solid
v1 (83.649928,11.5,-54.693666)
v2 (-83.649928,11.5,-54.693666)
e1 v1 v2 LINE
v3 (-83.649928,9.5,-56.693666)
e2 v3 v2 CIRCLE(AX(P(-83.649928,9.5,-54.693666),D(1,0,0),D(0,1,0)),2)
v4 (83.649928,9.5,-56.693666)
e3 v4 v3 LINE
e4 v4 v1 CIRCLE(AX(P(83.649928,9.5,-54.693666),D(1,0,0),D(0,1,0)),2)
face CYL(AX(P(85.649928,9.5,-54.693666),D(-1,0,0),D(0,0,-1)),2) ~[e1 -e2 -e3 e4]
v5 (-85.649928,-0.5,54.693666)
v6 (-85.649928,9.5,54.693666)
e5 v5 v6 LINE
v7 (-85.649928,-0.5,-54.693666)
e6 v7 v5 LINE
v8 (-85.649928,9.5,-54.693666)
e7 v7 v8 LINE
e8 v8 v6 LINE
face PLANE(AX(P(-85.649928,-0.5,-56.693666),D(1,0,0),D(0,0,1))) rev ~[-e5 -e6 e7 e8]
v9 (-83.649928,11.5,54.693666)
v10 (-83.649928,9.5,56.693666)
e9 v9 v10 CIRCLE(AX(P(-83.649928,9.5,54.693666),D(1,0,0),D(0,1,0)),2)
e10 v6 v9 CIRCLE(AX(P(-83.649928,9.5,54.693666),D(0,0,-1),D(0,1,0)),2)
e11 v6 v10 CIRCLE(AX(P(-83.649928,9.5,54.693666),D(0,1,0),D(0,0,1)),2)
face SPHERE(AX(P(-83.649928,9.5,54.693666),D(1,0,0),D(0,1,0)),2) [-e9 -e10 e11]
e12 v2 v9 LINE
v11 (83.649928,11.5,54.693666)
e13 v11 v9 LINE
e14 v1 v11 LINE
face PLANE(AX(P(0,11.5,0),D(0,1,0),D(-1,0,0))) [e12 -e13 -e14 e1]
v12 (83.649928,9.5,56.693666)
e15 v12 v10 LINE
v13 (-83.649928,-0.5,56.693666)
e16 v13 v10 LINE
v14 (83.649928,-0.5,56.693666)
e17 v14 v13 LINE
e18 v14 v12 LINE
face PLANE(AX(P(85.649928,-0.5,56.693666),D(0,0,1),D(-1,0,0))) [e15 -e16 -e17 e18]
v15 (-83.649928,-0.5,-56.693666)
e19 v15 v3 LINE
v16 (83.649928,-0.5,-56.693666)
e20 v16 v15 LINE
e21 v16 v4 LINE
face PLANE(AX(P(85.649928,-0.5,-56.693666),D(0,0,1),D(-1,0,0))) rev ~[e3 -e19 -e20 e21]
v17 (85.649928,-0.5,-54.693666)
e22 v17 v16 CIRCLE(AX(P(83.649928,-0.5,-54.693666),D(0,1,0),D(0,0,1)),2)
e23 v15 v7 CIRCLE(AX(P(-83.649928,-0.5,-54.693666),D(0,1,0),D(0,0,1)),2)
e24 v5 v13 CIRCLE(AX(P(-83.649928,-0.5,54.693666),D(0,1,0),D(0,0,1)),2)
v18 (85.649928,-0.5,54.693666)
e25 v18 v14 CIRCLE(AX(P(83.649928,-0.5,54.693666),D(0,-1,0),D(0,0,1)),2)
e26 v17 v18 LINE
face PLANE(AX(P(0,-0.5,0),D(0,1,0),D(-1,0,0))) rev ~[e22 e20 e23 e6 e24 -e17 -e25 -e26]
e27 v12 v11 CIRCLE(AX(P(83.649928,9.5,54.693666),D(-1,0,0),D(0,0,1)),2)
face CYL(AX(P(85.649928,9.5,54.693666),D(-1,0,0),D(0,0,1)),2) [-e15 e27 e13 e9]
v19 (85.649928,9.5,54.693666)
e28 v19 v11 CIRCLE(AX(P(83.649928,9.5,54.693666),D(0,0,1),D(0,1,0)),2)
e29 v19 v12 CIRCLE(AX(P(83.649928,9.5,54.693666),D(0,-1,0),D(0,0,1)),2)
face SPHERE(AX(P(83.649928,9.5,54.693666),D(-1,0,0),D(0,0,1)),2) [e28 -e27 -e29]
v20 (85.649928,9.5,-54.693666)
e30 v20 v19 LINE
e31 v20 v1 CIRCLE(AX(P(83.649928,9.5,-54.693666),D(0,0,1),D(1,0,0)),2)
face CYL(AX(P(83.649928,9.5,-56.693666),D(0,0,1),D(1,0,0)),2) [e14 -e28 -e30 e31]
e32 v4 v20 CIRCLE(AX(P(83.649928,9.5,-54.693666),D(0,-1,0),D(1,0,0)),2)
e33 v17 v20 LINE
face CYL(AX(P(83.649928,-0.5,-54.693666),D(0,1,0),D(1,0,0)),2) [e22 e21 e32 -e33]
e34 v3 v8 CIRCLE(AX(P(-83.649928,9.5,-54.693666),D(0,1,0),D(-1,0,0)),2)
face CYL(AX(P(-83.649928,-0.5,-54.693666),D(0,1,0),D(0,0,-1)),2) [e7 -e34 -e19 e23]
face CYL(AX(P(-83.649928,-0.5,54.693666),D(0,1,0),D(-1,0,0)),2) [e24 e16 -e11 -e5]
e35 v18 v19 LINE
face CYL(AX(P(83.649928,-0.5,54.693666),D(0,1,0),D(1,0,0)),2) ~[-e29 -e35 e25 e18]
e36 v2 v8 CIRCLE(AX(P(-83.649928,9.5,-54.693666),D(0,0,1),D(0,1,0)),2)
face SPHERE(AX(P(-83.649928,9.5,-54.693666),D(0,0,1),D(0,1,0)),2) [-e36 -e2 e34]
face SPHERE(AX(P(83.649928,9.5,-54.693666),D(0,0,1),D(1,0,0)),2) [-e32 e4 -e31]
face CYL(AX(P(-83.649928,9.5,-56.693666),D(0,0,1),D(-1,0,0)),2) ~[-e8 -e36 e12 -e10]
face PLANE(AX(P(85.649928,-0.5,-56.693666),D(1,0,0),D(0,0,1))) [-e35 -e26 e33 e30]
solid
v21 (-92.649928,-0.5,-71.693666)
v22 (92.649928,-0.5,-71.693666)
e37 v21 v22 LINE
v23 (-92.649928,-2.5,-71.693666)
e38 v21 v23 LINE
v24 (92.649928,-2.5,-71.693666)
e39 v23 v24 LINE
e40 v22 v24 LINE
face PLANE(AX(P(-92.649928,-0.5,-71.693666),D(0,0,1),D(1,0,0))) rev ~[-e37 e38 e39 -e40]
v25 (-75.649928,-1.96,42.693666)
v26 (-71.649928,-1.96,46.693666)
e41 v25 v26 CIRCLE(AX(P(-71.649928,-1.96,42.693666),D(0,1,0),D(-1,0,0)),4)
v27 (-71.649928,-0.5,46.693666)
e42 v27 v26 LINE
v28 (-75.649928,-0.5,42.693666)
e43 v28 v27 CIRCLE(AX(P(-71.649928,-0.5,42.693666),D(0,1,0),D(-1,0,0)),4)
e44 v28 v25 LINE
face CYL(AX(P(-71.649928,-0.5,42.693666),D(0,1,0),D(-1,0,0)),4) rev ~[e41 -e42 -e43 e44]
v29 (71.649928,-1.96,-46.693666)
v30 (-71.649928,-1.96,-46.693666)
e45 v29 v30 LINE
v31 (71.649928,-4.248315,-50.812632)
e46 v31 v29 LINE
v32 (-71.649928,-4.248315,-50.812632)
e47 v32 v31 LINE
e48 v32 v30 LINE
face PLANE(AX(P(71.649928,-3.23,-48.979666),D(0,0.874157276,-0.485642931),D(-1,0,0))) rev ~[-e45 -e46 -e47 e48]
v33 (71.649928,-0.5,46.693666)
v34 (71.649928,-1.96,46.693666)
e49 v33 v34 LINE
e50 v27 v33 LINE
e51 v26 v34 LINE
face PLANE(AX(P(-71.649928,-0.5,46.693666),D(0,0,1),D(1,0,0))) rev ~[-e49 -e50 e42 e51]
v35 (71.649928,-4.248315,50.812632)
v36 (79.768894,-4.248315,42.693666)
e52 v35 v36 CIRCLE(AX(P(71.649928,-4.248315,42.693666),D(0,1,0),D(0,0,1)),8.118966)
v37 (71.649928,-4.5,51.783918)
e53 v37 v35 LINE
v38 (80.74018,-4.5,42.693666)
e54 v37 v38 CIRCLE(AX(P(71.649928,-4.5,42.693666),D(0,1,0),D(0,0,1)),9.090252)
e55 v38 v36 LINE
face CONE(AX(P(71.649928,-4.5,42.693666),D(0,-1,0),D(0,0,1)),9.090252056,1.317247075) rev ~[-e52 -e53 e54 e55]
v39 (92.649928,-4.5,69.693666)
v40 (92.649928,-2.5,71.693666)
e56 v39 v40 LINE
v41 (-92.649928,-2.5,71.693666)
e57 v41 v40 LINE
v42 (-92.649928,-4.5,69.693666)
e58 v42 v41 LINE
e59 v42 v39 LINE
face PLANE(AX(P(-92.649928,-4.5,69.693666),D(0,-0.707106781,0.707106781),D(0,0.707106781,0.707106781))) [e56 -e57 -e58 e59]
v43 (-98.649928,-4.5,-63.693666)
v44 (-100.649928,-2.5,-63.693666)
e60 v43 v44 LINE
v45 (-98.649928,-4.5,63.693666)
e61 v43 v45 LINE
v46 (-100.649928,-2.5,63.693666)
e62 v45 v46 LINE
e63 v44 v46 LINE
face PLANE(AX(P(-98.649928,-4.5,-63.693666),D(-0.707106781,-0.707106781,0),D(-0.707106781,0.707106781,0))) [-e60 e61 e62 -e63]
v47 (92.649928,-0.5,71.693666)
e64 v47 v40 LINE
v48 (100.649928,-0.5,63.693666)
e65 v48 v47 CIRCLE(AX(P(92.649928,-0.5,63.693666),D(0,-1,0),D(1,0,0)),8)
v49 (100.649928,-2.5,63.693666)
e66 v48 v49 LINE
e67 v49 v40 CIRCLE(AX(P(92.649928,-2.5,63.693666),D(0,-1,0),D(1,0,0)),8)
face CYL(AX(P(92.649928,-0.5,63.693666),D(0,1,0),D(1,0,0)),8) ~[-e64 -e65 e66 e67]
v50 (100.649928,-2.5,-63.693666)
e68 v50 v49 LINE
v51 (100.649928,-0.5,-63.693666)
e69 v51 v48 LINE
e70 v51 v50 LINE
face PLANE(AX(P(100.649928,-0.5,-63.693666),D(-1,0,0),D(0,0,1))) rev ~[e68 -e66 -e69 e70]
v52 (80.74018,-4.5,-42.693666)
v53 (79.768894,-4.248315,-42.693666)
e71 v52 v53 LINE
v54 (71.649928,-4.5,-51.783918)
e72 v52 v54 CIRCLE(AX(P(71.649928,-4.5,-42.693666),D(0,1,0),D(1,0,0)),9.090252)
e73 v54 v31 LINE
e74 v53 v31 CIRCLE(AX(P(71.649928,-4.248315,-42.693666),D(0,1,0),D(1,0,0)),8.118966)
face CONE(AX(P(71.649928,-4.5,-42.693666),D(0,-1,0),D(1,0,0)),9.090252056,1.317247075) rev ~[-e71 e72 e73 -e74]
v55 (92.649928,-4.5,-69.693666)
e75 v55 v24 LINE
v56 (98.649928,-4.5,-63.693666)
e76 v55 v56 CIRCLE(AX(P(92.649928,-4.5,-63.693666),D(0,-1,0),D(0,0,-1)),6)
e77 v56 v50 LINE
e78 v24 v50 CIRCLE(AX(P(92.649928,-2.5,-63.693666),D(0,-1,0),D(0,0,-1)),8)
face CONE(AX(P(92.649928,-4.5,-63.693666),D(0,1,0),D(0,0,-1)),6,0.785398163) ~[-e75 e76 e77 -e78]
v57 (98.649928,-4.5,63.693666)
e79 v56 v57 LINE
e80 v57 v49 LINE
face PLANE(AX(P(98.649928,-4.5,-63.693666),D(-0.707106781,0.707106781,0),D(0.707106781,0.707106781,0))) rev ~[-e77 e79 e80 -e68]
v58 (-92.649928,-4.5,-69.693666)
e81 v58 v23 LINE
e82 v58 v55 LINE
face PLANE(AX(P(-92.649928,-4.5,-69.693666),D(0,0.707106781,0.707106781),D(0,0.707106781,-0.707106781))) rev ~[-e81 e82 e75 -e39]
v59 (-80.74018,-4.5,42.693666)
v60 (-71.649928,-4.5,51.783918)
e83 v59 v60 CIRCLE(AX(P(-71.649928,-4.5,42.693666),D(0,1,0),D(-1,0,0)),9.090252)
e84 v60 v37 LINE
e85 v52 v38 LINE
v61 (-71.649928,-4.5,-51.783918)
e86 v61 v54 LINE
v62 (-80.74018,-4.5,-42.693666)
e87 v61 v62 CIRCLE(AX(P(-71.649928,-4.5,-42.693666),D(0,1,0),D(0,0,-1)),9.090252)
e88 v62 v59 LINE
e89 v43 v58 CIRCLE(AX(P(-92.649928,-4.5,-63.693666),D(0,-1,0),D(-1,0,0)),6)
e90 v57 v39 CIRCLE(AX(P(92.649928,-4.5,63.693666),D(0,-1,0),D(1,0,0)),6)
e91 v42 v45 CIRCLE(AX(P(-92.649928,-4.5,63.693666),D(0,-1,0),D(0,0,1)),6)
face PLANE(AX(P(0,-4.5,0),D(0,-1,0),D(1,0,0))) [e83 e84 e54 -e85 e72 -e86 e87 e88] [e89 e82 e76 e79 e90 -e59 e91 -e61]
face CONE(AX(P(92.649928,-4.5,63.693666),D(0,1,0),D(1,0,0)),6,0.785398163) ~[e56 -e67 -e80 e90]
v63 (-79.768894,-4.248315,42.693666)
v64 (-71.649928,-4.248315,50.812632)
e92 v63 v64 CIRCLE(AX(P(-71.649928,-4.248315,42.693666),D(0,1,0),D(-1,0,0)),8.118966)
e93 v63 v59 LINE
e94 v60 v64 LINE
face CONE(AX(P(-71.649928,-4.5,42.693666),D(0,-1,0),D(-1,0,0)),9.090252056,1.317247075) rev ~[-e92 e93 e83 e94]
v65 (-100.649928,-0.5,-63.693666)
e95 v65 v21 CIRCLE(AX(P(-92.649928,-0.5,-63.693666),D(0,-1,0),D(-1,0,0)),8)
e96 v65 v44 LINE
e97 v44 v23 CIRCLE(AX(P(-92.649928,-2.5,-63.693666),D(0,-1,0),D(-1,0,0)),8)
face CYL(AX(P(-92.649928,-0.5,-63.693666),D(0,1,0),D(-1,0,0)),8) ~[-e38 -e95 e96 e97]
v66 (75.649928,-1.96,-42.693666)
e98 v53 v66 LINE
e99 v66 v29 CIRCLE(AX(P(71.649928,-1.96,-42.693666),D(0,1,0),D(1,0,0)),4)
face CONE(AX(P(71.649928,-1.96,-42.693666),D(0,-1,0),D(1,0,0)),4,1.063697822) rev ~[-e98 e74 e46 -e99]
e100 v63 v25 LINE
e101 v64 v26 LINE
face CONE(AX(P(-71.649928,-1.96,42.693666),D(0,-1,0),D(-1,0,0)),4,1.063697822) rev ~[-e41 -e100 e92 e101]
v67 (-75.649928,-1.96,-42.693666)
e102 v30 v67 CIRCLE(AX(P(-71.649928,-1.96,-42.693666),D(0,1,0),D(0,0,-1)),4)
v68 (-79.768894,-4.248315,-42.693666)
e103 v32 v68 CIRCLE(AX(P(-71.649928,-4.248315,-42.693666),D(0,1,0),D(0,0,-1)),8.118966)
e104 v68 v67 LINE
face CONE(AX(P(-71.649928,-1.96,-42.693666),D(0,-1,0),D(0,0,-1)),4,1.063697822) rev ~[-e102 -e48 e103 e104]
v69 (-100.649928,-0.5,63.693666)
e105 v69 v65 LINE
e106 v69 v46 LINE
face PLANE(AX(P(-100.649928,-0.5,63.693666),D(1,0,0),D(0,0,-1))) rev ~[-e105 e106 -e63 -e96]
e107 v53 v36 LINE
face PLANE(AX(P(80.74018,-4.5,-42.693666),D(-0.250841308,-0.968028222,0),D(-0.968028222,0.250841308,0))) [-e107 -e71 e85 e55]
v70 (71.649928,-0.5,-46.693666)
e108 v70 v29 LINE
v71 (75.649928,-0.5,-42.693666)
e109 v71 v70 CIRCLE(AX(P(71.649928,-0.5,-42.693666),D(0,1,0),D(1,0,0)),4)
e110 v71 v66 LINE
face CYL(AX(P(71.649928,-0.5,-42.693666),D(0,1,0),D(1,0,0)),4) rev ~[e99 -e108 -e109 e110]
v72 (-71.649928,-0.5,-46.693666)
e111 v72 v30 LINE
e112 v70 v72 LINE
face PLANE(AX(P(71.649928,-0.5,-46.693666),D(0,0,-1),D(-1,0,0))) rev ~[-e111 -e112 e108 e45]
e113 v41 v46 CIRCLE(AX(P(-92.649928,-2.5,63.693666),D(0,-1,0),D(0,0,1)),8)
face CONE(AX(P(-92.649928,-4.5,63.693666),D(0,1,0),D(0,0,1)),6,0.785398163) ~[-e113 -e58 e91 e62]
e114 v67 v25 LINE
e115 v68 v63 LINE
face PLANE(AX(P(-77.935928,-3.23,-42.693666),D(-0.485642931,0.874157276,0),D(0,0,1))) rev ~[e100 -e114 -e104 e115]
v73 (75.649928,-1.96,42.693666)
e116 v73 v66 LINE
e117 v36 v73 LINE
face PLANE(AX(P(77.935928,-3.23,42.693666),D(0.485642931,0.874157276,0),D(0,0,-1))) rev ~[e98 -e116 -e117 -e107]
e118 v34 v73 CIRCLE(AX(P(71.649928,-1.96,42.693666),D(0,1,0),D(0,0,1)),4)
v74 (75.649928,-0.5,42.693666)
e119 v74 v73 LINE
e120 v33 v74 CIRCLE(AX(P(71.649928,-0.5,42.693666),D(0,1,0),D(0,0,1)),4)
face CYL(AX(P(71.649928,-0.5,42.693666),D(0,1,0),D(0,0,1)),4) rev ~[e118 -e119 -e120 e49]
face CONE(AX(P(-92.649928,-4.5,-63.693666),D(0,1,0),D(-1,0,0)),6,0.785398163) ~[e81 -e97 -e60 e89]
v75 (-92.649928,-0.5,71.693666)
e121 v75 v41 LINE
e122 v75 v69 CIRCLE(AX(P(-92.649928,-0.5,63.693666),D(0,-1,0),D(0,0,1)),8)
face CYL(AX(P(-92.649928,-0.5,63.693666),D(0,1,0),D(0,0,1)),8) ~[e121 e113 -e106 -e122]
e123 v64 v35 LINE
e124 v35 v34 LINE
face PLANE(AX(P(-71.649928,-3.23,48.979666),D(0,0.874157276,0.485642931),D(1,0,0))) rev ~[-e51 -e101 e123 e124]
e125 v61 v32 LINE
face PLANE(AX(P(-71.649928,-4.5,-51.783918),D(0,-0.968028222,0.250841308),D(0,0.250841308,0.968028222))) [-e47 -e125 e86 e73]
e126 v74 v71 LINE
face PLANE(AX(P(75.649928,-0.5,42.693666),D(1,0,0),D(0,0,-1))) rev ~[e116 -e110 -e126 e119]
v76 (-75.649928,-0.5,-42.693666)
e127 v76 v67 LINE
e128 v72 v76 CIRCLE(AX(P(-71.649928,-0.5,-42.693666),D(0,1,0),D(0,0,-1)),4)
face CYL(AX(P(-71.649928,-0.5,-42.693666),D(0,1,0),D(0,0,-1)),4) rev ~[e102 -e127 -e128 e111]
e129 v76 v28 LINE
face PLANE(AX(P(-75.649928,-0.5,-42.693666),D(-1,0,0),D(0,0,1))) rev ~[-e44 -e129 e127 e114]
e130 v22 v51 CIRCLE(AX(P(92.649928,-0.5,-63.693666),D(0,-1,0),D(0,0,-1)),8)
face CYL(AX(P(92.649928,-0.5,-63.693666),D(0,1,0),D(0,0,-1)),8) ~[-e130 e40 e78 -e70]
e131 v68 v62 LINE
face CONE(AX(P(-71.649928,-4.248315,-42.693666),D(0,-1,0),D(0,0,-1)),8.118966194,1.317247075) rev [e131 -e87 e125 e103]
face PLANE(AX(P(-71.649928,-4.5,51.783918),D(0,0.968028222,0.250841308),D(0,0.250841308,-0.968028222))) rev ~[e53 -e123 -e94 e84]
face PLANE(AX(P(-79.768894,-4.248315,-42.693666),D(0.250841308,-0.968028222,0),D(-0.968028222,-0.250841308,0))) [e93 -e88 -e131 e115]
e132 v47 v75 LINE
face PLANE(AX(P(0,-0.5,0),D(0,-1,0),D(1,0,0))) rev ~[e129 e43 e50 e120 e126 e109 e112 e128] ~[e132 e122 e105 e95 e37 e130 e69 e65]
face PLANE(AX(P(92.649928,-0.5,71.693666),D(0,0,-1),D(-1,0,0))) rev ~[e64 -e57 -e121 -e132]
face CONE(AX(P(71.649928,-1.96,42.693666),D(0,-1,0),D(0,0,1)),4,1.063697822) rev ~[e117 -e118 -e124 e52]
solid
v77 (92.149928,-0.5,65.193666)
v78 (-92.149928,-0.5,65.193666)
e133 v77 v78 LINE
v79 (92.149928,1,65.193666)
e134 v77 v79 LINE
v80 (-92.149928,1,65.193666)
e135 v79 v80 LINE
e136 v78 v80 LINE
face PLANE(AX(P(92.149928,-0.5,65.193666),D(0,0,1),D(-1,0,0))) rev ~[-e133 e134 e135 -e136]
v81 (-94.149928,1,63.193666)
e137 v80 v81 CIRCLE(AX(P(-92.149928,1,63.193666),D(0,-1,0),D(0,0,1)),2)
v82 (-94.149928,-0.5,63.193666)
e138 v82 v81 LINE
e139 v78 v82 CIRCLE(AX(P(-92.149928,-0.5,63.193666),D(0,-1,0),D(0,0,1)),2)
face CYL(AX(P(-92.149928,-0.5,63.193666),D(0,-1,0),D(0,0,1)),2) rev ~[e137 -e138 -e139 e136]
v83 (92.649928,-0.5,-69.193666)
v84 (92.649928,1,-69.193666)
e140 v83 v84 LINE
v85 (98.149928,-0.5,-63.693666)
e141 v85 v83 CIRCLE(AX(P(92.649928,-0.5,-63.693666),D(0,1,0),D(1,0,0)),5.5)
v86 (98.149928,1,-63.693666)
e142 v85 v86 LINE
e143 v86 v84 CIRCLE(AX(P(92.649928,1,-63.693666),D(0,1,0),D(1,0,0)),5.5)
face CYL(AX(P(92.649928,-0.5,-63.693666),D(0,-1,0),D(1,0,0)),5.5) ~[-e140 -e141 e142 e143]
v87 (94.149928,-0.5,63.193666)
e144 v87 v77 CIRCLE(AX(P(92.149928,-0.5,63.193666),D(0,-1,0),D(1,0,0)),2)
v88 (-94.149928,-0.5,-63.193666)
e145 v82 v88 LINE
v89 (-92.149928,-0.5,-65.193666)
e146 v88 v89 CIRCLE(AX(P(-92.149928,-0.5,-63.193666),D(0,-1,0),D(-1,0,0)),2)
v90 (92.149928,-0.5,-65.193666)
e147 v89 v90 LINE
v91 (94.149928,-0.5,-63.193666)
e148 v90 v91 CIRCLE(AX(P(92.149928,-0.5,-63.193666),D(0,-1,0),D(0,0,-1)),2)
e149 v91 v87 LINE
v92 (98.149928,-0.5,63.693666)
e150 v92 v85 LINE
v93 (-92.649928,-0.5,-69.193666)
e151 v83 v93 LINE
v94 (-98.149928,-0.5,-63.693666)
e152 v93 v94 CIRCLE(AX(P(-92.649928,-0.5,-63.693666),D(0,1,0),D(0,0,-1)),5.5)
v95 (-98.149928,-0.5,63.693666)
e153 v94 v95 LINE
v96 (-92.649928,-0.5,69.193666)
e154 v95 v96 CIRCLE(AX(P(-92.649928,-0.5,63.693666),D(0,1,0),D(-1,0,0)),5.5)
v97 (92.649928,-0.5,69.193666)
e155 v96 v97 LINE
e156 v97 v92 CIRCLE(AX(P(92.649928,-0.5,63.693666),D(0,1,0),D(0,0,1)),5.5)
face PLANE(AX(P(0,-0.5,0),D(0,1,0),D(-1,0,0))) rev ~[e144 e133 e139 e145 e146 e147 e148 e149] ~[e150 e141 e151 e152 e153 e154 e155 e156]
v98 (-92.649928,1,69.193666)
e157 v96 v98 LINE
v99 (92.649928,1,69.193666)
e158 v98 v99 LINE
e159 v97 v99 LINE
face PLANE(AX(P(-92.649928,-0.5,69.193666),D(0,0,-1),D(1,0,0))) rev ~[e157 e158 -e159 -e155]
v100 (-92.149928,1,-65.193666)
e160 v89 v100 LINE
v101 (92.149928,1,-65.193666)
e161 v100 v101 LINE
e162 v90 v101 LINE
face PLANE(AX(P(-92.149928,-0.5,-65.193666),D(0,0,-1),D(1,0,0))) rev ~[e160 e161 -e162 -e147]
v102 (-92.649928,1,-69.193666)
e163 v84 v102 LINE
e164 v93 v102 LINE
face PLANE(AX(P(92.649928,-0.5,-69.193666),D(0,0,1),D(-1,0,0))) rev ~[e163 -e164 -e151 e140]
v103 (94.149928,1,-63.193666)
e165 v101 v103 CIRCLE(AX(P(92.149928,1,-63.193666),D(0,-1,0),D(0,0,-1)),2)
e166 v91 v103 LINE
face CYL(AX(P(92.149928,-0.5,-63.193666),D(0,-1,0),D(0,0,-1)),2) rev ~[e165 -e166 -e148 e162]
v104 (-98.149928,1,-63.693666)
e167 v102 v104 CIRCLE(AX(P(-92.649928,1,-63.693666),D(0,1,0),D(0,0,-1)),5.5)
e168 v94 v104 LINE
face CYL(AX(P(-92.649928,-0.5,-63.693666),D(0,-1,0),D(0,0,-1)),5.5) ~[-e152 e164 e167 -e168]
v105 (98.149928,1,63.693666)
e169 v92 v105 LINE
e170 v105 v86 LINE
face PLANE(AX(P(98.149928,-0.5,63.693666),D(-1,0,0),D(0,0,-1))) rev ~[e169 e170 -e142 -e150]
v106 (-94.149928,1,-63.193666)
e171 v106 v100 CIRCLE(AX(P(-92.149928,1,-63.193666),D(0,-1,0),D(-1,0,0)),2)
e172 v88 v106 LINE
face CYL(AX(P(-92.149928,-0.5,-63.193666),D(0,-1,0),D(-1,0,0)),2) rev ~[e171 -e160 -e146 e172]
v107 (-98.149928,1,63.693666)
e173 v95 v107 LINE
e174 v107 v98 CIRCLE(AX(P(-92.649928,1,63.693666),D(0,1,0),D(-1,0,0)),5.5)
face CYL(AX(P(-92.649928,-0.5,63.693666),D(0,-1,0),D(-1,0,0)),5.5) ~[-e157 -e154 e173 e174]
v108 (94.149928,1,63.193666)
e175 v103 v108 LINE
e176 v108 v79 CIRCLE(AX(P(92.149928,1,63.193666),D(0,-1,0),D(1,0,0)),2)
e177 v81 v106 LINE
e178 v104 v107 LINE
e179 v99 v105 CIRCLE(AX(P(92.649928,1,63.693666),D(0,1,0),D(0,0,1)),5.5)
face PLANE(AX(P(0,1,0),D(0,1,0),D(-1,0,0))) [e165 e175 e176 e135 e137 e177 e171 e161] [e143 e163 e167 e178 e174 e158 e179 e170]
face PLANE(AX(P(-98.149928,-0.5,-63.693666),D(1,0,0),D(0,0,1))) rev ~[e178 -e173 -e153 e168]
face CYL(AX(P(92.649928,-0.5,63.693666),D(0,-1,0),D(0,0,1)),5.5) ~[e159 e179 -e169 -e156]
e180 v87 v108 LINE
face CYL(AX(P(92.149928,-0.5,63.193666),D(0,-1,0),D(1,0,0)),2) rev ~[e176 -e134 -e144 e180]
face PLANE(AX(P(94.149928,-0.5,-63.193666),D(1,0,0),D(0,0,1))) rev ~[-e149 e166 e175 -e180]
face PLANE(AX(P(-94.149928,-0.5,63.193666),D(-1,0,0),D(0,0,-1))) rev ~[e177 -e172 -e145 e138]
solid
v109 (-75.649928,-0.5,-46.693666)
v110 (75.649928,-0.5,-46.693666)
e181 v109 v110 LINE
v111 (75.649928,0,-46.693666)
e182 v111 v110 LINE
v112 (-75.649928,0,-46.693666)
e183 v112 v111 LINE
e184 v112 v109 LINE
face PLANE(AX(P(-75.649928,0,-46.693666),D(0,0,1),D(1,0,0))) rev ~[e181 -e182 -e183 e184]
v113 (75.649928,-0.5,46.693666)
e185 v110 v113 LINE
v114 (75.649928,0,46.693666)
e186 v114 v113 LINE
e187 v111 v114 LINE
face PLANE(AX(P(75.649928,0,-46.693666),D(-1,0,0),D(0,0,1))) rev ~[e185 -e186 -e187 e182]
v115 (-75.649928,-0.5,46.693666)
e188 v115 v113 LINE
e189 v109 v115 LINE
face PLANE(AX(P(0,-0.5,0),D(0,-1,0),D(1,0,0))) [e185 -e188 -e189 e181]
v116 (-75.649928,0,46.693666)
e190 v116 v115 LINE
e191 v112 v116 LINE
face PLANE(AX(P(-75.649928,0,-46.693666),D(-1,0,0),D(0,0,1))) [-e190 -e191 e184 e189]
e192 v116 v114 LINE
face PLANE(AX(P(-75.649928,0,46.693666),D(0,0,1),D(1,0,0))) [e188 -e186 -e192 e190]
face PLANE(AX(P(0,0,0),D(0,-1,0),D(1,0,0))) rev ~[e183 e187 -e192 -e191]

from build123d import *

# Parameters (mm, degrees)
F0_W         = 151.2998556506
F0_H         = 93.3873314755
F1_DEPTH     = 0.5
F3_DEPTH     = 4
F4_SIZE2     = 2.54
F4_SIZE      = 4.572
F5_T1_DEPTH  = 85.3873314755
F5_T3_DEPTH  = 143.2998556506
F5_T5_DEPTH  = 185.2998556506
F5_T7_DEPTH  = 127.3873314755
F5_T10_ANGLE = 90
F5_T12_ANGLE = 90
F5_T14_ANGLE = 90
F5_T16_ANGLE = 90
F5_T18_ANGLE = 90
F5_T20_ANGLE = 90
F5_T22_ANGLE = 90
F5_T24_ANGLE = 90
F7_DEPTH     = 1.5
F8_W         = 171.2998556506
F8_H         = 113.3873314755
F9_DEPTH     = 12
F10_R        = 2


# Not quite as in the source:
# - a fillet or chamfer that OpenCascade refuses, or shapes differently, is made with other operations: its cross-section is extruded or revolved along the edge and cut away or added


with BuildPart() as f1:
    # F0 (on Front) → F1 (new body)
    with BuildSketch(Plane.XZ):
        Rectangle(F0_W, F0_H)
    extrude(amount=F1_DEPTH)


with BuildPart() as f3:
    # F2 (on face) → F3 (new body)
    with BuildSketch(Plane.XZ.offset(0.5)):
        with BuildLine():
            ThreePointArc((-100.6499278253, -63.6936657378), (-98.3067820748, -69.3505199872), (-92.6499278253, -71.6936657378))
            Line((-92.6499278253, -71.6936657378), (92.6499278253, -71.6936657378))
            ThreePointArc((92.6499278253, -71.6936657378), (98.3067820748, -69.3505199872), (100.6499278253, -63.6936657378))
            Line((100.6499278253, -63.6936657378), (100.6499278253, 63.6936657378))
            ThreePointArc((100.6499278253, 63.6936657378), (98.3067820748, 69.3505199872), (92.6499278253, 71.6936657378))
            Line((92.6499278253, 71.6936657378), (-92.6499278253, 71.6936657378))
            ThreePointArc((-92.6499278253, 71.6936657378), (-98.3067820748, 69.3505199872), (-100.6499278253, 63.6936657378))
            Line((-100.6499278253, 63.6936657378), (-100.6499278253, -63.6936657378))
        make_face()
        Polygon((71.6499278253, -46.6936657378), (-71.6499278253, -46.6936657378), (-75.6499278253, -46.6936657378), (-75.6499278253, -42.6936657378), (-75.6499278253, 42.6936657378), (-75.6499278253, 46.6936657378), (-71.6499278253, 46.6936657378), (71.6499278253, 46.6936657378), (75.6499278253, 46.6936657378), (75.6499278253, 42.6936657378), (75.6499278253, -42.6936657378), (75.6499278253, -46.6936657378), align=None, mode=Mode.SUBTRACT)
        with BuildLine():
            ThreePointArc((71.6499278253, 46.6936657378), (74.47835495, 45.5220928625), (75.6499278253, 42.6936657378))
            Line((75.6499278253, 42.6936657378), (75.6499278253, 46.6936657378))
            Line((75.6499278253, 46.6936657378), (71.6499278253, 46.6936657378))
        make_face()
        with BuildLine():
            Line((-75.6499278253, -46.6936657378), (-71.6499278253, -46.6936657378))
            ThreePointArc((-71.6499278253, -46.6936657378), (-74.47835495, -45.5220928625), (-75.6499278253, -42.6936657378))
            Line((-75.6499278253, -42.6936657378), (-75.6499278253, -46.6936657378))
        make_face()
        with BuildLine():
            ThreePointArc((75.6499278253, -42.6936657378), (74.47835495, -45.5220928625), (71.6499278253, -46.6936657378))
            Line((71.6499278253, -46.6936657378), (75.6499278253, -46.6936657378))
            Line((75.6499278253, -46.6936657378), (75.6499278253, -42.6936657378))
        make_face()
        with BuildLine():
            Line((-75.6499278253, 46.6936657378), (-75.6499278253, 42.6936657378))
            ThreePointArc((-75.6499278253, 42.6936657378), (-74.47835495, 45.5220928625), (-71.6499278253, 46.6936657378))
            Line((-71.6499278253, 46.6936657378), (-75.6499278253, 46.6936657378))
        make_face()
    extrude(amount=F3_DEPTH)

    # F4
    f4_edges = [f3.edges().sort_by_distance(p)[0] for p in [
        (-75.649928, -4.5, 0),
    ]]
    f4_side = f3.faces().sort_by_distance((-96.55919, -4.5, -67.602928))[0]
    chamfer(f4_edges, length=F4_SIZE, length2=F4_SIZE2, reference=f4_side)

    # F5: chamfer of 2 on 16 edges, made by hand

    # F5_s2 → F5_t1 (cut)
    with BuildSketch(Plane.XY.offset(-42.6936657378)):
        Polygon((-79.7688940193, -4.2483145522), (-80.7401798817, -4.5), (-80.2219278253, -4.5), align=None)
        Polygon((80.7401798817, -4.5), (79.7688940193, -4.2483145522), (80.2219278253, -4.5), align=None)
    extrude(amount=F5_T1_DEPTH, mode=Mode.SUBTRACT)

    # F5_s4 → F5_t3 (cut)
    with BuildSketch(Plane.YZ.offset(-71.6499278253)):
        Polygon((-4.5, -51.7839177941), (-4.2483145522, -50.8126319318), (-4.5, -51.2656657378), align=None)
        Polygon((-4.5, 51.7839177941), (-4.2483145522, 50.8126319318), (-4.5, 51.2656657378), align=None)
    extrude(amount=F5_T3_DEPTH, mode=Mode.SUBTRACT)

    # F5_s6 → F5_t5 (cut)
    with BuildSketch(Plane.YZ.offset(-92.6499278253)):
        Polygon((-4.5, -69.6936657378), (-2.5, -71.6936657378), (-4.5, -71.6936657378), align=None)
        Polygon((-4.5, 69.6936657378), (-2.5, 71.6936657378), (-4.5, 71.6936657378), align=None)
    extrude(amount=F5_T5_DEPTH, mode=Mode.SUBTRACT)

    # F5_s8 → F5_t7 (cut)
    with BuildSketch(Plane.XY.offset(-63.6936657378)):
        Polygon((98.6499278253, -4.5), (100.6499278253, -2.5), (100.6499278253, -4.5), align=None)
        Polygon((-98.6499278253, -4.5), (-100.6499278253, -2.5), (-100.6499278253, -4.5), align=None)
    extrude(amount=F5_T7_DEPTH, mode=Mode.SUBTRACT)

    # F5_s9 → F5_t10 (revolve, cut)
    with BuildSketch(Plane.YZ.offset(-71.6499278253)):
        Polygon((-4.2483145522, -50.8126319318), (-4.5, -51.7839177941), (-4.5, -51.2656657378), align=None)
    revolve(axis=Axis((-71.6499278253, -4.5, -42.6936657378), (0, 1, 0)), revolution_arc=F5_T10_ANGLE, mode=Mode.SUBTRACT)

    # F5_s11 → F5_t12 (revolve, cut)
    with BuildSketch(Plane.XY.offset(42.6936657378)):
        Polygon((-80.7401798817, -4.5), (-79.7688940193, -4.2483145522), (-80.2219278253, -4.5), align=None)
    revolve(axis=Axis((-71.6499278253, -4.5, 42.6936657378), (0, 1, 0)), revolution_arc=F5_T12_ANGLE, mode=Mode.SUBTRACT)

    # F5_s13 → F5_t14 (revolve, cut)
    with BuildSketch(Plane.XY.offset(-42.6936657378)):
        Polygon((80.7401798817, -4.5), (79.7688940193, -4.2483145522), (80.2219278253, -4.5), align=None)
    revolve(axis=Axis((71.6499278253, -4.5, -42.6936657378), (0, 1, 0)), revolution_arc=F5_T14_ANGLE, mode=Mode.SUBTRACT)

    # F5_s15 → F5_t16 (revolve, cut)
    with BuildSketch(Plane.YZ.offset(71.6499278253)):
        Polygon((-4.5, 51.7839177941), (-4.2483145522, 50.8126319318), (-4.5, 51.2656657378), align=None)
    revolve(axis=Axis((71.6499278253, -4.5, 42.6936657378), (0, 1, 0)), revolution_arc=F5_T16_ANGLE, mode=Mode.SUBTRACT)

    # F5_s17 → F5_t18 (revolve, cut)
    with BuildSketch(Plane.XY.offset(-63.6936657378)):
        Polygon((-98.6499278253, -4.5), (-100.6499278253, -2.5), (-100.6499278253, -4.5), align=None)
    revolve(axis=Axis((-92.6499278253, -4.5, -63.6936657378), (0, -1, 0)), revolution_arc=F5_T18_ANGLE, mode=Mode.SUBTRACT)

    # F5_s19 → F5_t20 (revolve, cut)
    with BuildSketch(Plane.YZ.offset(92.6499278253)):
        Polygon((-4.5, -69.6936657378), (-2.5, -71.6936657378), (-4.5, -71.6936657378), align=None)
    revolve(axis=Axis((92.6499278253, -4.5, -63.6936657378), (0, -1, 0)), revolution_arc=F5_T20_ANGLE, mode=Mode.SUBTRACT)

    # F5_s21 → F5_t22 (revolve, cut)
    with BuildSketch(Plane.XY.offset(63.6936657378)):
        Polygon((98.6499278253, -4.5), (100.6499278253, -2.5), (100.6499278253, -4.5), align=None)
    revolve(axis=Axis((92.6499278253, -4.5, 63.6936657378), (0, -1, 0)), revolution_arc=F5_T22_ANGLE, mode=Mode.SUBTRACT)

    # F5_s23 → F5_t24 (revolve, cut)
    with BuildSketch(Plane.YZ.offset(-92.6499278253)):
        Polygon((-4.5, 69.6936657378), (-2.5, 71.6936657378), (-4.5, 71.6936657378), align=None)
    revolve(axis=Axis((-92.6499278253, -4.5, 63.6936657378), (0, -1, 0)), revolution_arc=F5_T24_ANGLE, mode=Mode.SUBTRACT)


with BuildPart() as f7:
    # F6 (on face) → F7 (new body)
    with BuildSketch(Plane(origin=(0, -0.5, 0), x_dir=(-1, 0, 0), z_dir=(0, 1, 0))):
        with BuildLine():
            Line((98.1499278253, -63.6936657378), (98.1499278253, 63.6936657378))
            ThreePointArc((98.1499278253, 63.6936657378), (96.5390151218, 67.5827530343), (92.6499278253, 69.1936657378))
            Line((92.6499278253, 69.1936657378), (-92.6499278253, 69.1936657378))
            ThreePointArc((-92.6499278253, 69.1936657378), (-96.5390151218, 67.5827530343), (-98.1499278253, 63.6936657378))
            Line((-98.1499278253, 63.6936657378), (-98.1499278253, -63.6936657378))
            ThreePointArc((-98.1499278253, -63.6936657378), (-96.5390151218, -67.5827530343), (-92.6499278253, -69.1936657378))
            Line((-92.6499278253, -69.1936657378), (92.6499278253, -69.1936657378))
            ThreePointArc((92.6499278253, -69.1936657378), (96.5390151218, -67.5827530343), (98.1499278253, -63.6936657378))
        make_face()
        with BuildLine():
            Line((-92.1499278253, 65.1936657378), (92.1499278253, 65.1936657378))
            ThreePointArc((92.1499278253, 65.1936657378), (93.5641413877, 64.6078793001), (94.1499278253, 63.1936657378))
            Line((94.1499278253, 63.1936657378), (94.1499278253, -63.1936657378))
            ThreePointArc((94.1499278253, -63.1936657378), (93.5641413877, -64.6078793001), (92.1499278253, -65.1936657378))
            Line((92.1499278253, -65.1936657378), (-92.1499278253, -65.1936657378))
            ThreePointArc((-92.1499278253, -65.1936657378), (-93.5641413877, -64.6078793001), (-94.1499278253, -63.1936657378))
            Line((-94.1499278253, -63.1936657378), (-94.1499278253, 63.1936657378))
            ThreePointArc((-94.1499278253, 63.1936657378), (-93.5641413877, 64.6078793001), (-92.1499278253, 65.1936657378))
        make_face(mode=Mode.SUBTRACT)
    extrude(amount=F7_DEPTH)


with BuildPart() as f9:
    # F8 (on face) → F9 (new body)
    with BuildSketch(Plane(origin=(0, -0.5, 0), x_dir=(-1, 0, 0), z_dir=(0, 1, 0))):
        Rectangle(F8_W, F8_H)
    extrude(amount=F9_DEPTH)

    # F10
    f10_edges = [f9.edges().sort_by_distance(p)[0] for p in [
        (0, 11.5, 56.693666),
        (-85.649928, 11.5, 0),
        (-85.649928, 5.5, 56.693666),
        (85.649928, 5.5, 56.693666),
        (85.649928, 11.5, 0),
        (85.649928, 5.5, -56.693666),
        (0, 11.5, -56.693666),
        (-85.649928, 5.5, -56.693666),
    ]]
    fillet(f10_edges, radius=F10_R)


solid = Compound([f1.part, f3.part, f7.part, f9.part])
